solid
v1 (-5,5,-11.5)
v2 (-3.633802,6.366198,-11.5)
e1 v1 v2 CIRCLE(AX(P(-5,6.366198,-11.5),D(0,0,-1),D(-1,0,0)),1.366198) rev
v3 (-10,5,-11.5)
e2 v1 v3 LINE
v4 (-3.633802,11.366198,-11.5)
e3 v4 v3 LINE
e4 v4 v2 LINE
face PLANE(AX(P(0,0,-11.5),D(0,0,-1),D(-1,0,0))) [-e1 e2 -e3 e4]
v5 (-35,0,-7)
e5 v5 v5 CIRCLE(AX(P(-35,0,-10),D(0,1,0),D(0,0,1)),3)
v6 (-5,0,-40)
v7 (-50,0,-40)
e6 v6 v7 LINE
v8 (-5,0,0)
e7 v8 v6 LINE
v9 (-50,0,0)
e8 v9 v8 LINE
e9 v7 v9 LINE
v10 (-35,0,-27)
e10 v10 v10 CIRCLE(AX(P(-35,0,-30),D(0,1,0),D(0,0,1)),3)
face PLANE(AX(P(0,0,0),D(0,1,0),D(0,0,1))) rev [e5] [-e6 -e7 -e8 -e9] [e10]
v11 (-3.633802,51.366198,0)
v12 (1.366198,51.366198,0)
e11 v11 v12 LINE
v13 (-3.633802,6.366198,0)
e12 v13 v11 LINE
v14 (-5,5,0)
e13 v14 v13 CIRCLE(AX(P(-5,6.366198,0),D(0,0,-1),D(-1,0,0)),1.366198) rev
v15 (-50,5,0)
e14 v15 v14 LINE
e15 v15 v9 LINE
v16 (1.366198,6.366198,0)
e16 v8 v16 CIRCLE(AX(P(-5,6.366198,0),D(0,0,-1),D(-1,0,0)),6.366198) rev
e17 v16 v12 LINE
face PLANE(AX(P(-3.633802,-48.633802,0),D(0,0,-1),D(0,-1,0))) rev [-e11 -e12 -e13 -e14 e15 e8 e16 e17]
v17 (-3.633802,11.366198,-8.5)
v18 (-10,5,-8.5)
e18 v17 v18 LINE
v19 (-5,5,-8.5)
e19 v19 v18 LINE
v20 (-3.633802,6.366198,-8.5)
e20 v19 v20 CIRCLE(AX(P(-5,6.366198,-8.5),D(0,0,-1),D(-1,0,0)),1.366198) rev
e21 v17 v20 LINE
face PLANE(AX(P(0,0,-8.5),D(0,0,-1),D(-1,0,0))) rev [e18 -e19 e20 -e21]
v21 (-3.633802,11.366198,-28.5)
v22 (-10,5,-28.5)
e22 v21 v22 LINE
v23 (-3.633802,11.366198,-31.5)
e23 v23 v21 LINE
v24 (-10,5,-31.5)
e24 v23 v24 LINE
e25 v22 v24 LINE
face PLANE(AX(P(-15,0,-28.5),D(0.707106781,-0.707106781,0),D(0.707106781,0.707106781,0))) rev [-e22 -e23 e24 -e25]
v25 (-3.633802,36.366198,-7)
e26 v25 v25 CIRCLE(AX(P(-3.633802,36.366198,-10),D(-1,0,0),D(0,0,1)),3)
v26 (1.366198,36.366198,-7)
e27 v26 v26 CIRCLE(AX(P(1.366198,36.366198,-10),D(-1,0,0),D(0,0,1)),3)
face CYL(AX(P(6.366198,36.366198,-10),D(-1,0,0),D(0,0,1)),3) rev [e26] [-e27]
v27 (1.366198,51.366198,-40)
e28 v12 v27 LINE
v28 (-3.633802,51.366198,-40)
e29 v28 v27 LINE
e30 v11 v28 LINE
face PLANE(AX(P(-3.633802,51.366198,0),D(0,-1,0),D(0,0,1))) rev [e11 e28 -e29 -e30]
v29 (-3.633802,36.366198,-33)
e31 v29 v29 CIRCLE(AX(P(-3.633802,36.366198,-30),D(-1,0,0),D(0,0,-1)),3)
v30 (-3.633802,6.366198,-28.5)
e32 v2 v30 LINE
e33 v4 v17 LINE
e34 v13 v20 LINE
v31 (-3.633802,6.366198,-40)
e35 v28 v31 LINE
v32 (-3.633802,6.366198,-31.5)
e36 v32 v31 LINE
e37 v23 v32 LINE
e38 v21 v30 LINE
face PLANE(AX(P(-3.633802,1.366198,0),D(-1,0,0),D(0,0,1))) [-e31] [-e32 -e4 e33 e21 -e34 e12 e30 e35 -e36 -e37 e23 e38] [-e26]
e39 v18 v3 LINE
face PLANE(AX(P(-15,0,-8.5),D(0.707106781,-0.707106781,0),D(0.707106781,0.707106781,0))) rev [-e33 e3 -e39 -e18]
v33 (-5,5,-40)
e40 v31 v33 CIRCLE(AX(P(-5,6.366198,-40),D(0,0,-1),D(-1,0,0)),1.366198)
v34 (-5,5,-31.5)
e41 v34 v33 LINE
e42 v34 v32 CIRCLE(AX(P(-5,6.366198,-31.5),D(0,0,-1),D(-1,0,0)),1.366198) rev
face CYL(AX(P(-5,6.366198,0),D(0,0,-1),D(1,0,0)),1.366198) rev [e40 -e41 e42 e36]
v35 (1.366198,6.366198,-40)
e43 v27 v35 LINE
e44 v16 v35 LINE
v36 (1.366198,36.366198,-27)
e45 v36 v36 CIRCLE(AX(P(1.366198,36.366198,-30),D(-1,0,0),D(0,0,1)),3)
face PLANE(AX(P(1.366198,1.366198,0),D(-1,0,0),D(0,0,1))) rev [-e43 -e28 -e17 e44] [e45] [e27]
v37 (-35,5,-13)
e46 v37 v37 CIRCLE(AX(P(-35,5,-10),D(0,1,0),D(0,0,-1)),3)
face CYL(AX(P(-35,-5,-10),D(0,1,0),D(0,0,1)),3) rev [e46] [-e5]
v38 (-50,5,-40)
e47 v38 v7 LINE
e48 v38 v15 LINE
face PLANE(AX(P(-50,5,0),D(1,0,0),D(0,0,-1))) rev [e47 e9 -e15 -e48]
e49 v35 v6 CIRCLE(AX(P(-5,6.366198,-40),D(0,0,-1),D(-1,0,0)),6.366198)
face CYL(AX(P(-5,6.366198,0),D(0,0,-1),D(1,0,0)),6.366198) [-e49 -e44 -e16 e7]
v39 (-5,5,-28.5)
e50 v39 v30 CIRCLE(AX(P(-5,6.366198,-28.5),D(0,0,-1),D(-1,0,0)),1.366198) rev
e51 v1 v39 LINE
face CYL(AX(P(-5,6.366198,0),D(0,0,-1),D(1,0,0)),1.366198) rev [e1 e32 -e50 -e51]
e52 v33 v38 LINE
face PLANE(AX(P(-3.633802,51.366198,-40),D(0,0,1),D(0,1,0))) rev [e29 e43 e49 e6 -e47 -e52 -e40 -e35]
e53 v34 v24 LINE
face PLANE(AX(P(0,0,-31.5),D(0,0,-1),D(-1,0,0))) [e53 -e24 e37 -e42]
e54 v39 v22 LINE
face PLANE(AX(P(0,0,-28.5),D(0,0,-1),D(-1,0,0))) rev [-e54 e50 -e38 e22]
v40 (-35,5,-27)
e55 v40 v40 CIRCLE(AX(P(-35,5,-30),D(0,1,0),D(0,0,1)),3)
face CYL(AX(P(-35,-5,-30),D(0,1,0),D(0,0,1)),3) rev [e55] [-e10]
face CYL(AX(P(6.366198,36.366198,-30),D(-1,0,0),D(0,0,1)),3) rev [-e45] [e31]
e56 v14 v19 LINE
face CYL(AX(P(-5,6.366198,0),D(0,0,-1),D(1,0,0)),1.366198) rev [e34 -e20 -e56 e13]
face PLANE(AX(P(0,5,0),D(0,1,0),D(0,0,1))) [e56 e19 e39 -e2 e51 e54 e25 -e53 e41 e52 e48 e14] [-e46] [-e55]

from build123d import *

# Parameters (mm, degrees)
SKETCH1_W           = 100
SKETCH1_H           = 40
BOSS_EXTRUDE2_DEPTH = 5
SKETCH4_R           = 3
CUT_EXTRUDE6_DEPTH  = 10
FLEX3_START         = 1.366197724
FLEX3_OUTLINE_W     = 5
FLEX3_OUTLINE_H     = 40
FLEX3_DEPTH         = 48.633802276
FLEX3_START_2       = -3.633802276
FLEX3_2_OUTLINE_W   = 46.366197724
FLEX3_2_OUTLINE_H   = 40
FLEX3_2_OUTLINE_R   = 3
FLEX3_2_DEPTH       = 3.907802276
FLEX3_START_3       = -5
FLEX3_3_OUTLINE_W   = 46.366197724
FLEX3_3_OUTLINE_H   = 40
FLEX3_3_OUTLINE_R   = 3
FLEX3_3_DEPTH       = 6.366197724
FLEX3_START_4       = -40
FLEX3_4_DEPTH       = 40
BOSS_EXTRUDE3_DEPTH = 1.5
CUT_EXTRUDE7_START  = -43
CUT_EXTRUDE7_DEPTH  = 43
BOSS_EXTRUDE4_DEPTH = 1.5
CUT_EXTRUDE8_DEPTH  = 40


with BuildPart() as part:
    # Sketch1 → Boss-Extrude2 (new body)
    with BuildSketch(Plane(origin=(0, 0, 0), x_dir=(1, 0, 0), z_dir=(0, 1, 0))):
        with Locations((0, 20)):
            Rectangle(SKETCH1_W, SKETCH1_H)
    extrude(amount=BOSS_EXTRUDE2_DEPTH)

    # Sketch4 → Cut-Extrude6 (cut)
    with BuildSketch(Plane(origin=(0, 5, 0), x_dir=(1, 0, 0), z_dir=(0, 1, 0))):
        with Locations(Location((-35, 30, 0), (0, 0, 270))):
            Circle(SKETCH4_R)
        with Locations(Location((-35, 10, 0), (0, 0, 270))):
            Circle(SKETCH4_R)
        with Locations(Location((35, 10, 0), (0, 0, 270))):
            Circle(SKETCH4_R)
        with Locations(Location((35, 30, 0), (0, 0, 270))):
            Circle(SKETCH4_R)
    extrude(amount=-CUT_EXTRUDE6_DEPTH, mode=Mode.SUBTRACT)

    # Flex3: read off the stored shape, not the designer's step
    # Flex3 outline → Flex3 (cut)
    with BuildSketch(Plane.YZ.offset(FLEX3_START)):
        with Locations((2.5, -20)):
            Rectangle(FLEX3_OUTLINE_W, FLEX3_OUTLINE_H)
    extrude(amount=FLEX3_DEPTH, mode=Mode.SUBTRACT)

    # Flex3 2 outline → Flex3 2 (add)
    with BuildSketch(Plane.YZ.offset(FLEX3_START_2)):
        with Locations((28.183098862, -20)):
            Rectangle(FLEX3_2_OUTLINE_W, FLEX3_2_OUTLINE_H)
        with Locations((36.366197724, -30)):
            Circle(FLEX3_2_OUTLINE_R, mode=Mode.SUBTRACT)
        with Locations((36.366197724, -10)):
            Circle(FLEX3_2_OUTLINE_R, mode=Mode.SUBTRACT)
    extrude(amount=FLEX3_2_DEPTH)

    # Flex3 3 outline → Flex3 3 (add)
    with BuildSketch(Plane.YZ.offset(FLEX3_START_3)):
        with Locations((28.183098862, -20)):
            Rectangle(FLEX3_3_OUTLINE_W, FLEX3_3_OUTLINE_H)
        with Locations((36.366197724, -30)):
            Circle(FLEX3_3_OUTLINE_R, mode=Mode.SUBTRACT)
        with Locations((36.366197724, -10)):
            Circle(FLEX3_3_OUTLINE_R, mode=Mode.SUBTRACT)
    extrude(amount=FLEX3_3_DEPTH)

    # Flex3 4 outline → Flex3 4 (cut)
    with BuildSketch(Plane.XY.offset(FLEX3_START_4)):
        with BuildLine():
            Line((1.366197724, 0), (1.366197724, 6.366197724))
            ThreePointArc((1.366197724, 6.366197724), (-0.498418419, 1.864616143), (-5, 0))
            Line((-5, 0), (1.366197724, 0))
        make_face()
        with BuildLine():
            ThreePointArc((-5, 5), (-4.033952325, 5.400150049), (-3.633802276, 6.366197724))
            Line((-3.633802276, 6.366197724), (-3.633802276, 51.366197724))
            Line((-3.633802276, 51.366197724), (-5, 51.366197724))
            Line((-5, 51.366197724), (-5, 5))
        make_face()
    extrude(amount=FLEX3_4_DEPTH, mode=Mode.SUBTRACT)

    # Sketch6 → Boss-Extrude3 (add, symmetric)
    with BuildSketch(Plane.XY.offset(-10)):
        Polygon((0, 0), (0, 15), (-15, 0), align=None)
    extrude(amount=BOSS_EXTRUDE3_DEPTH, both=True)

    # Sketch7 → Cut-Extrude7 (cut)
    with BuildSketch(Plane.XY.offset(CUT_EXTRUDE7_START)):
        with BuildLine():
            Line((-5, 0), (0, 0))
            Line((0, 0), (0, 2.425579313))
            ThreePointArc((0, 2.425579313), (-2.221356671, 0.638404544), (-5, 0))
        make_face()
    extrude(amount=CUT_EXTRUDE7_DEPTH, mode=Mode.SUBTRACT)

    # Sketch9 → Boss-Extrude4 (add, symmetric)
    with BuildSketch(Plane.XY.offset(-30)):
        Polygon((0, 0), (0, 15), (-15, 0), align=None)
    extrude(amount=BOSS_EXTRUDE4_DEPTH, both=True)

    # Sketch10 → Cut-Extrude8 (cut)
    with BuildSketch(Plane(origin=(0, 0, -40), x_dir=(-1, 0, 0), z_dir=(0, 0, -1))):
        with BuildLine():
            Line((0, 2.425579313), (0, 0))
            Line((0, 0), (5, 0))
            ThreePointArc((5, 0), (2.221356671, 0.638404544), (0, 2.425579313))
        make_face()
    extrude(amount=-CUT_EXTRUDE8_DEPTH, mode=Mode.SUBTRACT)


solid = part.part
